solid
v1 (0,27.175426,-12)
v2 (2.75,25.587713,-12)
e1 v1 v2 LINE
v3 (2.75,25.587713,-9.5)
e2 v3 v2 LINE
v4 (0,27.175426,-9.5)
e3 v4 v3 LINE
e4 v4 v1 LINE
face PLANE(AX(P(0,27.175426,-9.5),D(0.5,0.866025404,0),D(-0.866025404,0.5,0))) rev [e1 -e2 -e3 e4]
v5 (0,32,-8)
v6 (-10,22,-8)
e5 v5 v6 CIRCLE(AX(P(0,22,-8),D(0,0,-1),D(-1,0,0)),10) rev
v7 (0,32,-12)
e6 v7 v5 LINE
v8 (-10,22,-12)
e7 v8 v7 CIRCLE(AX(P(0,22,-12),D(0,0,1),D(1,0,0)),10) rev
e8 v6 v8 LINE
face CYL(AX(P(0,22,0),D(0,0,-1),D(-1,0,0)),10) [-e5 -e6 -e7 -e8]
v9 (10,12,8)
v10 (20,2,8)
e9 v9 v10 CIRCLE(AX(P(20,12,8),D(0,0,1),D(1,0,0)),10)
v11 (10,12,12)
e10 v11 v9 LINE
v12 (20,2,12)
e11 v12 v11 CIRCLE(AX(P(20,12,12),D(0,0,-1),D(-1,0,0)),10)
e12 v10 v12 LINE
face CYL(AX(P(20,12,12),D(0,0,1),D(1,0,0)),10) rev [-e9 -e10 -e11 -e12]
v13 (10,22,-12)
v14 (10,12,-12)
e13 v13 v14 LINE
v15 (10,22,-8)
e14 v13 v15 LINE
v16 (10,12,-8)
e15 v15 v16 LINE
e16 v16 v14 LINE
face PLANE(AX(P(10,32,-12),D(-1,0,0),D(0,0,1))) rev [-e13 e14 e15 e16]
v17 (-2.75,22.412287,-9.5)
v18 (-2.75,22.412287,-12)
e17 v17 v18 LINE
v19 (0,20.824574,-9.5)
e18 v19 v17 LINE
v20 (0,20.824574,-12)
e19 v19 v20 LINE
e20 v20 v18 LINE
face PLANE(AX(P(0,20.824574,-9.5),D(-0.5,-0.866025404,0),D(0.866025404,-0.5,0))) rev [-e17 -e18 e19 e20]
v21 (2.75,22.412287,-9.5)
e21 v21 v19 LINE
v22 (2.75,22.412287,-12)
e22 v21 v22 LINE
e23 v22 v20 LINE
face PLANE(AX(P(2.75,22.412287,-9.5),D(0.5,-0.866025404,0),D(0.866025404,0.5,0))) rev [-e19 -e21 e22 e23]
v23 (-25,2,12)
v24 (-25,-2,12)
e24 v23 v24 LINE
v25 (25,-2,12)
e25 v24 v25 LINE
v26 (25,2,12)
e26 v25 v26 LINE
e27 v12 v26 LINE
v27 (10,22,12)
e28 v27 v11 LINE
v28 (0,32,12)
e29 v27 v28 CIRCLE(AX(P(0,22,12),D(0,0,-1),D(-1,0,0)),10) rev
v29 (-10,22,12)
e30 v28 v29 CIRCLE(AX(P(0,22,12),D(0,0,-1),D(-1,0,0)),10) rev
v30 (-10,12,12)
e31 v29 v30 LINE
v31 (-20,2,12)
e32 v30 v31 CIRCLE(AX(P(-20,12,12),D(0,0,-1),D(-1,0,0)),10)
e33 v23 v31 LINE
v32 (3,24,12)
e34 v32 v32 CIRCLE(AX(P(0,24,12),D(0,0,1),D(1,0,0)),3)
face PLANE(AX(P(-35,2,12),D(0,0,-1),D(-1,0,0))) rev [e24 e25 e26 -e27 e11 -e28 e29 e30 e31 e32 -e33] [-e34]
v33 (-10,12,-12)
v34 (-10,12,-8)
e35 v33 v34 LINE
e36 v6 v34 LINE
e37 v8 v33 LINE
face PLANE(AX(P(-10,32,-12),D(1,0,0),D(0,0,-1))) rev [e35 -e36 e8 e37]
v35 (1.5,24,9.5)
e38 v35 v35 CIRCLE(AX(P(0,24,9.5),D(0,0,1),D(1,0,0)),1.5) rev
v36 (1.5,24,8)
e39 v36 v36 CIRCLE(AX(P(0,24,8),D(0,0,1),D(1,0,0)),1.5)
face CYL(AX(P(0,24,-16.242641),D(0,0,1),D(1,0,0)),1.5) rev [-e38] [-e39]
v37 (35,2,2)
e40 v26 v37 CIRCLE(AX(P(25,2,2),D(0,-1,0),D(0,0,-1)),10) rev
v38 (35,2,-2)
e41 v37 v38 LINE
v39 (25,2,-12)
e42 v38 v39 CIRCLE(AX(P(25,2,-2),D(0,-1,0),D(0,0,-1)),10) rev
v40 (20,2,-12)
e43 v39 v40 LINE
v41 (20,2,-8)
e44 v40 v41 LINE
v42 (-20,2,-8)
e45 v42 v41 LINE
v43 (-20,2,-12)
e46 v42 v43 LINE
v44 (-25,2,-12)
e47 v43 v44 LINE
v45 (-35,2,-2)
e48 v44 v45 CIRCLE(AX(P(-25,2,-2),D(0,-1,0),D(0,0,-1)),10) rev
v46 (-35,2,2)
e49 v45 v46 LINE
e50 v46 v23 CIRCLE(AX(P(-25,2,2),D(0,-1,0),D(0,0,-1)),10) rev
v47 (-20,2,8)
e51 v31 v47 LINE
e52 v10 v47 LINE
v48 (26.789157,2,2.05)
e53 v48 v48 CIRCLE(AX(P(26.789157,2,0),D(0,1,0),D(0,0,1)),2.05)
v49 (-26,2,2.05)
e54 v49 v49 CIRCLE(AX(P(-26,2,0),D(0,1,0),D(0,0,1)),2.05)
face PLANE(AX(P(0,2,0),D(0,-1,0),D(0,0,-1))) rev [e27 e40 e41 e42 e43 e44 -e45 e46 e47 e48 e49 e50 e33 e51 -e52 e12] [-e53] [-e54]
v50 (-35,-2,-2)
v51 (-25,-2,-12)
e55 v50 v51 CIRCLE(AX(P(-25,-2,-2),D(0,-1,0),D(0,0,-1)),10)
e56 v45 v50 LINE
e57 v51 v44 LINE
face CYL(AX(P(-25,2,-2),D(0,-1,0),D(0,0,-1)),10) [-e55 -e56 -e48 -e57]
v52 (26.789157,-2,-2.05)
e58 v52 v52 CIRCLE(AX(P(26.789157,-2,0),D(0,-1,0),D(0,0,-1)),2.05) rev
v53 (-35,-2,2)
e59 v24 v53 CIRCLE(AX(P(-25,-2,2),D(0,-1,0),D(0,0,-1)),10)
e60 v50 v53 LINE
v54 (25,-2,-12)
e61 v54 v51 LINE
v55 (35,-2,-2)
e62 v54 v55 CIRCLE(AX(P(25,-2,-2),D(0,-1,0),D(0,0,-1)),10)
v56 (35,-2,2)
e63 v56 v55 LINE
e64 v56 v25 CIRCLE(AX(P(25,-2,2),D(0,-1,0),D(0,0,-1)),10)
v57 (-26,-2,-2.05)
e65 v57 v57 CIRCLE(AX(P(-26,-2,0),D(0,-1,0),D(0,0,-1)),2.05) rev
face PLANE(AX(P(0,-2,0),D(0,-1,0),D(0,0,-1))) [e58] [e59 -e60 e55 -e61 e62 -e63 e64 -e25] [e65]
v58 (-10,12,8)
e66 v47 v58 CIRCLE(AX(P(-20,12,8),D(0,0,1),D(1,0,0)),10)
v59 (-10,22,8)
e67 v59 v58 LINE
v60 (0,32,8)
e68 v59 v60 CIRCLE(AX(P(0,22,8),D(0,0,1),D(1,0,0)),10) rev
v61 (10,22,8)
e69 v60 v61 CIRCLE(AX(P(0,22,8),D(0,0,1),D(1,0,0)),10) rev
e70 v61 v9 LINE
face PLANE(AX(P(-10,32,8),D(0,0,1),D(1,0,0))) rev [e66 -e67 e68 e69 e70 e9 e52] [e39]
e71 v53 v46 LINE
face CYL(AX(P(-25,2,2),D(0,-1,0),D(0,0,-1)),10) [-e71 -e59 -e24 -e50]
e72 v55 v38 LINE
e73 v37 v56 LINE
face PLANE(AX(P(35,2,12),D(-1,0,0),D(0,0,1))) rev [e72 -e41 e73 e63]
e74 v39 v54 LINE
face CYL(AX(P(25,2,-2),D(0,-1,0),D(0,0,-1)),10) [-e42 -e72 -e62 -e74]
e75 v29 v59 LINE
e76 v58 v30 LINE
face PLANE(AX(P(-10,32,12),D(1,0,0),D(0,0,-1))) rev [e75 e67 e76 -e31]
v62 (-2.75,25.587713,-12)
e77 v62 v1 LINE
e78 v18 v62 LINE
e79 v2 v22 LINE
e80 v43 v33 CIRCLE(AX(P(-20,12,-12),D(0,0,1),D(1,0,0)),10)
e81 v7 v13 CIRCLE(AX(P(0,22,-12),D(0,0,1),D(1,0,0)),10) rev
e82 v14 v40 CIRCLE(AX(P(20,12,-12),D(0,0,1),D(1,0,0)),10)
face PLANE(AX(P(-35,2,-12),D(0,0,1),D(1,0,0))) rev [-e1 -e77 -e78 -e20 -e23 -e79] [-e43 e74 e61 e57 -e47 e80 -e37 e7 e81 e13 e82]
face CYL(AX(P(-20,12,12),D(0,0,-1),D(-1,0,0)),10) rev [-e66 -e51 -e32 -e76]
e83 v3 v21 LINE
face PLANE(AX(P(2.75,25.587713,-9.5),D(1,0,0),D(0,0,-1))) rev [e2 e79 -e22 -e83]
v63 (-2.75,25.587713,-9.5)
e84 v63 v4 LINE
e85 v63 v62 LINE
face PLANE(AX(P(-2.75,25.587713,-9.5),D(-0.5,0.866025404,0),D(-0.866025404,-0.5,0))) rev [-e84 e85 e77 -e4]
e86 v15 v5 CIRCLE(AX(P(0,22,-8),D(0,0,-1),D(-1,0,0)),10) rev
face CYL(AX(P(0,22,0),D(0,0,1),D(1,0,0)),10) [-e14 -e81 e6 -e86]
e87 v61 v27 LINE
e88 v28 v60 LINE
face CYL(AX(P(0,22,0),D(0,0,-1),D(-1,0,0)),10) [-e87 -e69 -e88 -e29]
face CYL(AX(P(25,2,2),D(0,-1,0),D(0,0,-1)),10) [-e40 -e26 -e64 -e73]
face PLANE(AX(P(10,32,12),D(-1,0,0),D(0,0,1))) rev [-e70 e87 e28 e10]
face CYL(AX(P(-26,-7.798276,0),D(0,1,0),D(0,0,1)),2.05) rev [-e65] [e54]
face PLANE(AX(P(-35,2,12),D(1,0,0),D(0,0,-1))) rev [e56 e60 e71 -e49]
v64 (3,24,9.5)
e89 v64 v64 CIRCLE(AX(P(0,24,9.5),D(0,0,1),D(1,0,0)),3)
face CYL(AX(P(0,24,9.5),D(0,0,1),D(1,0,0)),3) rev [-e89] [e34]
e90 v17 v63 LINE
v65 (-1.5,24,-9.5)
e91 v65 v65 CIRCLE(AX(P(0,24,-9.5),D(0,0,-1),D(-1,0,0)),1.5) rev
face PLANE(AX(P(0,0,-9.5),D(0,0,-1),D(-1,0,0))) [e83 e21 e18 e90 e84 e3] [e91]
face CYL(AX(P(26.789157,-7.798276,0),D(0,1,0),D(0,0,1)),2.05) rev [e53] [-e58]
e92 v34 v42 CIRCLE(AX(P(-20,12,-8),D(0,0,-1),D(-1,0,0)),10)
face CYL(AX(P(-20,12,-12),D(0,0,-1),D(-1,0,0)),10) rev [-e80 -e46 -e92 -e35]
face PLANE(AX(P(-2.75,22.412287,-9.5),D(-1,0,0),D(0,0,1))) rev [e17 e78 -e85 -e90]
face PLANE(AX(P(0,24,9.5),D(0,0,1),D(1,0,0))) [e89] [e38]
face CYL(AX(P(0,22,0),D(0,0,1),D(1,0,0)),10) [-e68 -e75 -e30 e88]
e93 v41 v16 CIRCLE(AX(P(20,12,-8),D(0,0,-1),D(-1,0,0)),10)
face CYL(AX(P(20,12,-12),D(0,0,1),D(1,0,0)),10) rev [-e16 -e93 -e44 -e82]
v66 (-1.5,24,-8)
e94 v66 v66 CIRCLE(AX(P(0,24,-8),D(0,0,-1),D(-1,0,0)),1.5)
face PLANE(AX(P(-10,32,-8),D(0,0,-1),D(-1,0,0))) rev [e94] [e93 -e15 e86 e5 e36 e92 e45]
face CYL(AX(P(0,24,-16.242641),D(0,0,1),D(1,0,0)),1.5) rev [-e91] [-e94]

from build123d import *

# Parameters (mm, degrees)
SKETCH1_W           = 70
SKETCH1_H           = 24
BOSS_EXTRUDE1_DEPTH = 2
SKETCH2_W           = 20
SKETCH2_H           = 4
BOSS_EXTRUDE2_DEPTH = 30
FILLET1_R           = 10
FILLET2_R           = 10
CUT_EXTRUDE1_REACH  = 55.151
SKETCH3_R           = 1.5
FILLET3_R           = 10
SKETCH4_R           = 2.05
CUT_EXTRUDE2_DEPTH  = 4
SKETCH5_R           = 3
CUT_EXTRUDE3_DEPTH  = 2.5
CUT_EXTRUDE4_DEPTH  = 2.5


with BuildPart() as part:
    # Sketch1 → Boss-Extrude1 (new, symmetric)
    with BuildSketch(Plane(origin=(0, 0, 0), x_dir=(1, 0, 0), z_dir=(0, 1, 0))):
        Rectangle(SKETCH1_W, SKETCH1_H)
    extrude(amount=BOSS_EXTRUDE1_DEPTH, both=True)

    # Sketch2 → Boss-Extrude2 (add)
    with BuildSketch(Plane(origin=(0, 2, 0), x_dir=(1, 0, 0), z_dir=(0, 1, 0))):
        with Locations((0, 10)):
            Rectangle(SKETCH2_W, SKETCH2_H)
        with Locations((0, -10)):
            Rectangle(SKETCH2_W, SKETCH2_H)
    extrude(amount=BOSS_EXTRUDE2_DEPTH)

    # Fillet1
    fillet1_edges = [part.edges().sort_by_distance(p)[0] for p in [
        (-10, 2, -10),
        (10, 2, -10),
        (-10, 2, 10),
        (10, 2, 10),
    ]]
    fillet(fillet1_edges, radius=FILLET1_R)

    # Fillet2
    fillet2_edges = [part.edges().sort_by_distance(p)[0] for p in [
        (-10, 32, 10),
        (10, 32, 10),
        (10, 32, -10),
        (-10, 32, -10),
    ]]
    fillet(fillet2_edges, radius=FILLET2_R - 0.0001)  # a hair under: the kernel refuses the full size

    # Cut-Extrude1: up to this face of the body (flat: up to its plane)
    cut_extrude1_end = Plane(part.part.faces().sort_by_distance((0, 10.345619741, -12))[0])
    # Sketch3 → Cut-Extrude1 (cut, up to the picked face)
    with BuildSketch(Plane.XY.offset(12), mode=Mode.PRIVATE) as cut_extrude1_sk1:
        with Locations((0, 24)):
            Circle(SKETCH3_R)
    cut_extrude1_tool1 = split(extrude(cut_extrude1_sk1.sketch, amount=-CUT_EXTRUDE1_REACH, mode=Mode.PRIVATE), bisect_by=cut_extrude1_end, keep=Keep.BOTH, mode=Mode.PRIVATE)
    add(cut_extrude1_tool1.solids().sort_by(Axis((0, 24, 12), (0, 0, -1)))[0], mode=Mode.SUBTRACT)

    # Fillet3
    fillet3_edges = [part.edges().sort_by_distance(p)[0] for p in [
        (35, 0, 12),
        (-35, 0, 12),
        (-35, 0, -12),
        (35, 0, -12),
    ]]
    fillet(fillet3_edges, radius=FILLET3_R)

    # Sketch4 → Cut-Extrude2 (cut)
    with BuildSketch(Plane(origin=(0, 2, 0), x_dir=(1, 0, 0), z_dir=(0, 1, 0))):
        with Locations(Location((-26, 0, 0), (0, 0, 270))):
            Circle(SKETCH4_R)
        with Locations(Location((26.78915656, 0, 0), (0, 0, 270))):
            Circle(SKETCH4_R)
    extrude(amount=-CUT_EXTRUDE2_DEPTH, mode=Mode.SUBTRACT)

    # Sketch5 → Cut-Extrude3 (cut)
    with BuildSketch(Plane.XY.offset(12)):
        with Locations((0, 24)):
            Circle(SKETCH5_R)
    extrude(amount=-CUT_EXTRUDE3_DEPTH, mode=Mode.SUBTRACT)

    # Sketch6 → Cut-Extrude4 (cut)
    with BuildSketch(Plane(origin=(0, 0, -12), x_dir=(-1, 0, 0), z_dir=(0, 0, -1))):
        Polygon((2.75, 25.58771324), (0, 27.175426481), (-2.75, 25.58771324), (-2.75, 22.41228676), (0, 20.824573519), (2.75, 22.41228676), align=None)
    extrude(amount=-CUT_EXTRUDE4_DEPTH, mode=Mode.SUBTRACT)


solid = part.part
